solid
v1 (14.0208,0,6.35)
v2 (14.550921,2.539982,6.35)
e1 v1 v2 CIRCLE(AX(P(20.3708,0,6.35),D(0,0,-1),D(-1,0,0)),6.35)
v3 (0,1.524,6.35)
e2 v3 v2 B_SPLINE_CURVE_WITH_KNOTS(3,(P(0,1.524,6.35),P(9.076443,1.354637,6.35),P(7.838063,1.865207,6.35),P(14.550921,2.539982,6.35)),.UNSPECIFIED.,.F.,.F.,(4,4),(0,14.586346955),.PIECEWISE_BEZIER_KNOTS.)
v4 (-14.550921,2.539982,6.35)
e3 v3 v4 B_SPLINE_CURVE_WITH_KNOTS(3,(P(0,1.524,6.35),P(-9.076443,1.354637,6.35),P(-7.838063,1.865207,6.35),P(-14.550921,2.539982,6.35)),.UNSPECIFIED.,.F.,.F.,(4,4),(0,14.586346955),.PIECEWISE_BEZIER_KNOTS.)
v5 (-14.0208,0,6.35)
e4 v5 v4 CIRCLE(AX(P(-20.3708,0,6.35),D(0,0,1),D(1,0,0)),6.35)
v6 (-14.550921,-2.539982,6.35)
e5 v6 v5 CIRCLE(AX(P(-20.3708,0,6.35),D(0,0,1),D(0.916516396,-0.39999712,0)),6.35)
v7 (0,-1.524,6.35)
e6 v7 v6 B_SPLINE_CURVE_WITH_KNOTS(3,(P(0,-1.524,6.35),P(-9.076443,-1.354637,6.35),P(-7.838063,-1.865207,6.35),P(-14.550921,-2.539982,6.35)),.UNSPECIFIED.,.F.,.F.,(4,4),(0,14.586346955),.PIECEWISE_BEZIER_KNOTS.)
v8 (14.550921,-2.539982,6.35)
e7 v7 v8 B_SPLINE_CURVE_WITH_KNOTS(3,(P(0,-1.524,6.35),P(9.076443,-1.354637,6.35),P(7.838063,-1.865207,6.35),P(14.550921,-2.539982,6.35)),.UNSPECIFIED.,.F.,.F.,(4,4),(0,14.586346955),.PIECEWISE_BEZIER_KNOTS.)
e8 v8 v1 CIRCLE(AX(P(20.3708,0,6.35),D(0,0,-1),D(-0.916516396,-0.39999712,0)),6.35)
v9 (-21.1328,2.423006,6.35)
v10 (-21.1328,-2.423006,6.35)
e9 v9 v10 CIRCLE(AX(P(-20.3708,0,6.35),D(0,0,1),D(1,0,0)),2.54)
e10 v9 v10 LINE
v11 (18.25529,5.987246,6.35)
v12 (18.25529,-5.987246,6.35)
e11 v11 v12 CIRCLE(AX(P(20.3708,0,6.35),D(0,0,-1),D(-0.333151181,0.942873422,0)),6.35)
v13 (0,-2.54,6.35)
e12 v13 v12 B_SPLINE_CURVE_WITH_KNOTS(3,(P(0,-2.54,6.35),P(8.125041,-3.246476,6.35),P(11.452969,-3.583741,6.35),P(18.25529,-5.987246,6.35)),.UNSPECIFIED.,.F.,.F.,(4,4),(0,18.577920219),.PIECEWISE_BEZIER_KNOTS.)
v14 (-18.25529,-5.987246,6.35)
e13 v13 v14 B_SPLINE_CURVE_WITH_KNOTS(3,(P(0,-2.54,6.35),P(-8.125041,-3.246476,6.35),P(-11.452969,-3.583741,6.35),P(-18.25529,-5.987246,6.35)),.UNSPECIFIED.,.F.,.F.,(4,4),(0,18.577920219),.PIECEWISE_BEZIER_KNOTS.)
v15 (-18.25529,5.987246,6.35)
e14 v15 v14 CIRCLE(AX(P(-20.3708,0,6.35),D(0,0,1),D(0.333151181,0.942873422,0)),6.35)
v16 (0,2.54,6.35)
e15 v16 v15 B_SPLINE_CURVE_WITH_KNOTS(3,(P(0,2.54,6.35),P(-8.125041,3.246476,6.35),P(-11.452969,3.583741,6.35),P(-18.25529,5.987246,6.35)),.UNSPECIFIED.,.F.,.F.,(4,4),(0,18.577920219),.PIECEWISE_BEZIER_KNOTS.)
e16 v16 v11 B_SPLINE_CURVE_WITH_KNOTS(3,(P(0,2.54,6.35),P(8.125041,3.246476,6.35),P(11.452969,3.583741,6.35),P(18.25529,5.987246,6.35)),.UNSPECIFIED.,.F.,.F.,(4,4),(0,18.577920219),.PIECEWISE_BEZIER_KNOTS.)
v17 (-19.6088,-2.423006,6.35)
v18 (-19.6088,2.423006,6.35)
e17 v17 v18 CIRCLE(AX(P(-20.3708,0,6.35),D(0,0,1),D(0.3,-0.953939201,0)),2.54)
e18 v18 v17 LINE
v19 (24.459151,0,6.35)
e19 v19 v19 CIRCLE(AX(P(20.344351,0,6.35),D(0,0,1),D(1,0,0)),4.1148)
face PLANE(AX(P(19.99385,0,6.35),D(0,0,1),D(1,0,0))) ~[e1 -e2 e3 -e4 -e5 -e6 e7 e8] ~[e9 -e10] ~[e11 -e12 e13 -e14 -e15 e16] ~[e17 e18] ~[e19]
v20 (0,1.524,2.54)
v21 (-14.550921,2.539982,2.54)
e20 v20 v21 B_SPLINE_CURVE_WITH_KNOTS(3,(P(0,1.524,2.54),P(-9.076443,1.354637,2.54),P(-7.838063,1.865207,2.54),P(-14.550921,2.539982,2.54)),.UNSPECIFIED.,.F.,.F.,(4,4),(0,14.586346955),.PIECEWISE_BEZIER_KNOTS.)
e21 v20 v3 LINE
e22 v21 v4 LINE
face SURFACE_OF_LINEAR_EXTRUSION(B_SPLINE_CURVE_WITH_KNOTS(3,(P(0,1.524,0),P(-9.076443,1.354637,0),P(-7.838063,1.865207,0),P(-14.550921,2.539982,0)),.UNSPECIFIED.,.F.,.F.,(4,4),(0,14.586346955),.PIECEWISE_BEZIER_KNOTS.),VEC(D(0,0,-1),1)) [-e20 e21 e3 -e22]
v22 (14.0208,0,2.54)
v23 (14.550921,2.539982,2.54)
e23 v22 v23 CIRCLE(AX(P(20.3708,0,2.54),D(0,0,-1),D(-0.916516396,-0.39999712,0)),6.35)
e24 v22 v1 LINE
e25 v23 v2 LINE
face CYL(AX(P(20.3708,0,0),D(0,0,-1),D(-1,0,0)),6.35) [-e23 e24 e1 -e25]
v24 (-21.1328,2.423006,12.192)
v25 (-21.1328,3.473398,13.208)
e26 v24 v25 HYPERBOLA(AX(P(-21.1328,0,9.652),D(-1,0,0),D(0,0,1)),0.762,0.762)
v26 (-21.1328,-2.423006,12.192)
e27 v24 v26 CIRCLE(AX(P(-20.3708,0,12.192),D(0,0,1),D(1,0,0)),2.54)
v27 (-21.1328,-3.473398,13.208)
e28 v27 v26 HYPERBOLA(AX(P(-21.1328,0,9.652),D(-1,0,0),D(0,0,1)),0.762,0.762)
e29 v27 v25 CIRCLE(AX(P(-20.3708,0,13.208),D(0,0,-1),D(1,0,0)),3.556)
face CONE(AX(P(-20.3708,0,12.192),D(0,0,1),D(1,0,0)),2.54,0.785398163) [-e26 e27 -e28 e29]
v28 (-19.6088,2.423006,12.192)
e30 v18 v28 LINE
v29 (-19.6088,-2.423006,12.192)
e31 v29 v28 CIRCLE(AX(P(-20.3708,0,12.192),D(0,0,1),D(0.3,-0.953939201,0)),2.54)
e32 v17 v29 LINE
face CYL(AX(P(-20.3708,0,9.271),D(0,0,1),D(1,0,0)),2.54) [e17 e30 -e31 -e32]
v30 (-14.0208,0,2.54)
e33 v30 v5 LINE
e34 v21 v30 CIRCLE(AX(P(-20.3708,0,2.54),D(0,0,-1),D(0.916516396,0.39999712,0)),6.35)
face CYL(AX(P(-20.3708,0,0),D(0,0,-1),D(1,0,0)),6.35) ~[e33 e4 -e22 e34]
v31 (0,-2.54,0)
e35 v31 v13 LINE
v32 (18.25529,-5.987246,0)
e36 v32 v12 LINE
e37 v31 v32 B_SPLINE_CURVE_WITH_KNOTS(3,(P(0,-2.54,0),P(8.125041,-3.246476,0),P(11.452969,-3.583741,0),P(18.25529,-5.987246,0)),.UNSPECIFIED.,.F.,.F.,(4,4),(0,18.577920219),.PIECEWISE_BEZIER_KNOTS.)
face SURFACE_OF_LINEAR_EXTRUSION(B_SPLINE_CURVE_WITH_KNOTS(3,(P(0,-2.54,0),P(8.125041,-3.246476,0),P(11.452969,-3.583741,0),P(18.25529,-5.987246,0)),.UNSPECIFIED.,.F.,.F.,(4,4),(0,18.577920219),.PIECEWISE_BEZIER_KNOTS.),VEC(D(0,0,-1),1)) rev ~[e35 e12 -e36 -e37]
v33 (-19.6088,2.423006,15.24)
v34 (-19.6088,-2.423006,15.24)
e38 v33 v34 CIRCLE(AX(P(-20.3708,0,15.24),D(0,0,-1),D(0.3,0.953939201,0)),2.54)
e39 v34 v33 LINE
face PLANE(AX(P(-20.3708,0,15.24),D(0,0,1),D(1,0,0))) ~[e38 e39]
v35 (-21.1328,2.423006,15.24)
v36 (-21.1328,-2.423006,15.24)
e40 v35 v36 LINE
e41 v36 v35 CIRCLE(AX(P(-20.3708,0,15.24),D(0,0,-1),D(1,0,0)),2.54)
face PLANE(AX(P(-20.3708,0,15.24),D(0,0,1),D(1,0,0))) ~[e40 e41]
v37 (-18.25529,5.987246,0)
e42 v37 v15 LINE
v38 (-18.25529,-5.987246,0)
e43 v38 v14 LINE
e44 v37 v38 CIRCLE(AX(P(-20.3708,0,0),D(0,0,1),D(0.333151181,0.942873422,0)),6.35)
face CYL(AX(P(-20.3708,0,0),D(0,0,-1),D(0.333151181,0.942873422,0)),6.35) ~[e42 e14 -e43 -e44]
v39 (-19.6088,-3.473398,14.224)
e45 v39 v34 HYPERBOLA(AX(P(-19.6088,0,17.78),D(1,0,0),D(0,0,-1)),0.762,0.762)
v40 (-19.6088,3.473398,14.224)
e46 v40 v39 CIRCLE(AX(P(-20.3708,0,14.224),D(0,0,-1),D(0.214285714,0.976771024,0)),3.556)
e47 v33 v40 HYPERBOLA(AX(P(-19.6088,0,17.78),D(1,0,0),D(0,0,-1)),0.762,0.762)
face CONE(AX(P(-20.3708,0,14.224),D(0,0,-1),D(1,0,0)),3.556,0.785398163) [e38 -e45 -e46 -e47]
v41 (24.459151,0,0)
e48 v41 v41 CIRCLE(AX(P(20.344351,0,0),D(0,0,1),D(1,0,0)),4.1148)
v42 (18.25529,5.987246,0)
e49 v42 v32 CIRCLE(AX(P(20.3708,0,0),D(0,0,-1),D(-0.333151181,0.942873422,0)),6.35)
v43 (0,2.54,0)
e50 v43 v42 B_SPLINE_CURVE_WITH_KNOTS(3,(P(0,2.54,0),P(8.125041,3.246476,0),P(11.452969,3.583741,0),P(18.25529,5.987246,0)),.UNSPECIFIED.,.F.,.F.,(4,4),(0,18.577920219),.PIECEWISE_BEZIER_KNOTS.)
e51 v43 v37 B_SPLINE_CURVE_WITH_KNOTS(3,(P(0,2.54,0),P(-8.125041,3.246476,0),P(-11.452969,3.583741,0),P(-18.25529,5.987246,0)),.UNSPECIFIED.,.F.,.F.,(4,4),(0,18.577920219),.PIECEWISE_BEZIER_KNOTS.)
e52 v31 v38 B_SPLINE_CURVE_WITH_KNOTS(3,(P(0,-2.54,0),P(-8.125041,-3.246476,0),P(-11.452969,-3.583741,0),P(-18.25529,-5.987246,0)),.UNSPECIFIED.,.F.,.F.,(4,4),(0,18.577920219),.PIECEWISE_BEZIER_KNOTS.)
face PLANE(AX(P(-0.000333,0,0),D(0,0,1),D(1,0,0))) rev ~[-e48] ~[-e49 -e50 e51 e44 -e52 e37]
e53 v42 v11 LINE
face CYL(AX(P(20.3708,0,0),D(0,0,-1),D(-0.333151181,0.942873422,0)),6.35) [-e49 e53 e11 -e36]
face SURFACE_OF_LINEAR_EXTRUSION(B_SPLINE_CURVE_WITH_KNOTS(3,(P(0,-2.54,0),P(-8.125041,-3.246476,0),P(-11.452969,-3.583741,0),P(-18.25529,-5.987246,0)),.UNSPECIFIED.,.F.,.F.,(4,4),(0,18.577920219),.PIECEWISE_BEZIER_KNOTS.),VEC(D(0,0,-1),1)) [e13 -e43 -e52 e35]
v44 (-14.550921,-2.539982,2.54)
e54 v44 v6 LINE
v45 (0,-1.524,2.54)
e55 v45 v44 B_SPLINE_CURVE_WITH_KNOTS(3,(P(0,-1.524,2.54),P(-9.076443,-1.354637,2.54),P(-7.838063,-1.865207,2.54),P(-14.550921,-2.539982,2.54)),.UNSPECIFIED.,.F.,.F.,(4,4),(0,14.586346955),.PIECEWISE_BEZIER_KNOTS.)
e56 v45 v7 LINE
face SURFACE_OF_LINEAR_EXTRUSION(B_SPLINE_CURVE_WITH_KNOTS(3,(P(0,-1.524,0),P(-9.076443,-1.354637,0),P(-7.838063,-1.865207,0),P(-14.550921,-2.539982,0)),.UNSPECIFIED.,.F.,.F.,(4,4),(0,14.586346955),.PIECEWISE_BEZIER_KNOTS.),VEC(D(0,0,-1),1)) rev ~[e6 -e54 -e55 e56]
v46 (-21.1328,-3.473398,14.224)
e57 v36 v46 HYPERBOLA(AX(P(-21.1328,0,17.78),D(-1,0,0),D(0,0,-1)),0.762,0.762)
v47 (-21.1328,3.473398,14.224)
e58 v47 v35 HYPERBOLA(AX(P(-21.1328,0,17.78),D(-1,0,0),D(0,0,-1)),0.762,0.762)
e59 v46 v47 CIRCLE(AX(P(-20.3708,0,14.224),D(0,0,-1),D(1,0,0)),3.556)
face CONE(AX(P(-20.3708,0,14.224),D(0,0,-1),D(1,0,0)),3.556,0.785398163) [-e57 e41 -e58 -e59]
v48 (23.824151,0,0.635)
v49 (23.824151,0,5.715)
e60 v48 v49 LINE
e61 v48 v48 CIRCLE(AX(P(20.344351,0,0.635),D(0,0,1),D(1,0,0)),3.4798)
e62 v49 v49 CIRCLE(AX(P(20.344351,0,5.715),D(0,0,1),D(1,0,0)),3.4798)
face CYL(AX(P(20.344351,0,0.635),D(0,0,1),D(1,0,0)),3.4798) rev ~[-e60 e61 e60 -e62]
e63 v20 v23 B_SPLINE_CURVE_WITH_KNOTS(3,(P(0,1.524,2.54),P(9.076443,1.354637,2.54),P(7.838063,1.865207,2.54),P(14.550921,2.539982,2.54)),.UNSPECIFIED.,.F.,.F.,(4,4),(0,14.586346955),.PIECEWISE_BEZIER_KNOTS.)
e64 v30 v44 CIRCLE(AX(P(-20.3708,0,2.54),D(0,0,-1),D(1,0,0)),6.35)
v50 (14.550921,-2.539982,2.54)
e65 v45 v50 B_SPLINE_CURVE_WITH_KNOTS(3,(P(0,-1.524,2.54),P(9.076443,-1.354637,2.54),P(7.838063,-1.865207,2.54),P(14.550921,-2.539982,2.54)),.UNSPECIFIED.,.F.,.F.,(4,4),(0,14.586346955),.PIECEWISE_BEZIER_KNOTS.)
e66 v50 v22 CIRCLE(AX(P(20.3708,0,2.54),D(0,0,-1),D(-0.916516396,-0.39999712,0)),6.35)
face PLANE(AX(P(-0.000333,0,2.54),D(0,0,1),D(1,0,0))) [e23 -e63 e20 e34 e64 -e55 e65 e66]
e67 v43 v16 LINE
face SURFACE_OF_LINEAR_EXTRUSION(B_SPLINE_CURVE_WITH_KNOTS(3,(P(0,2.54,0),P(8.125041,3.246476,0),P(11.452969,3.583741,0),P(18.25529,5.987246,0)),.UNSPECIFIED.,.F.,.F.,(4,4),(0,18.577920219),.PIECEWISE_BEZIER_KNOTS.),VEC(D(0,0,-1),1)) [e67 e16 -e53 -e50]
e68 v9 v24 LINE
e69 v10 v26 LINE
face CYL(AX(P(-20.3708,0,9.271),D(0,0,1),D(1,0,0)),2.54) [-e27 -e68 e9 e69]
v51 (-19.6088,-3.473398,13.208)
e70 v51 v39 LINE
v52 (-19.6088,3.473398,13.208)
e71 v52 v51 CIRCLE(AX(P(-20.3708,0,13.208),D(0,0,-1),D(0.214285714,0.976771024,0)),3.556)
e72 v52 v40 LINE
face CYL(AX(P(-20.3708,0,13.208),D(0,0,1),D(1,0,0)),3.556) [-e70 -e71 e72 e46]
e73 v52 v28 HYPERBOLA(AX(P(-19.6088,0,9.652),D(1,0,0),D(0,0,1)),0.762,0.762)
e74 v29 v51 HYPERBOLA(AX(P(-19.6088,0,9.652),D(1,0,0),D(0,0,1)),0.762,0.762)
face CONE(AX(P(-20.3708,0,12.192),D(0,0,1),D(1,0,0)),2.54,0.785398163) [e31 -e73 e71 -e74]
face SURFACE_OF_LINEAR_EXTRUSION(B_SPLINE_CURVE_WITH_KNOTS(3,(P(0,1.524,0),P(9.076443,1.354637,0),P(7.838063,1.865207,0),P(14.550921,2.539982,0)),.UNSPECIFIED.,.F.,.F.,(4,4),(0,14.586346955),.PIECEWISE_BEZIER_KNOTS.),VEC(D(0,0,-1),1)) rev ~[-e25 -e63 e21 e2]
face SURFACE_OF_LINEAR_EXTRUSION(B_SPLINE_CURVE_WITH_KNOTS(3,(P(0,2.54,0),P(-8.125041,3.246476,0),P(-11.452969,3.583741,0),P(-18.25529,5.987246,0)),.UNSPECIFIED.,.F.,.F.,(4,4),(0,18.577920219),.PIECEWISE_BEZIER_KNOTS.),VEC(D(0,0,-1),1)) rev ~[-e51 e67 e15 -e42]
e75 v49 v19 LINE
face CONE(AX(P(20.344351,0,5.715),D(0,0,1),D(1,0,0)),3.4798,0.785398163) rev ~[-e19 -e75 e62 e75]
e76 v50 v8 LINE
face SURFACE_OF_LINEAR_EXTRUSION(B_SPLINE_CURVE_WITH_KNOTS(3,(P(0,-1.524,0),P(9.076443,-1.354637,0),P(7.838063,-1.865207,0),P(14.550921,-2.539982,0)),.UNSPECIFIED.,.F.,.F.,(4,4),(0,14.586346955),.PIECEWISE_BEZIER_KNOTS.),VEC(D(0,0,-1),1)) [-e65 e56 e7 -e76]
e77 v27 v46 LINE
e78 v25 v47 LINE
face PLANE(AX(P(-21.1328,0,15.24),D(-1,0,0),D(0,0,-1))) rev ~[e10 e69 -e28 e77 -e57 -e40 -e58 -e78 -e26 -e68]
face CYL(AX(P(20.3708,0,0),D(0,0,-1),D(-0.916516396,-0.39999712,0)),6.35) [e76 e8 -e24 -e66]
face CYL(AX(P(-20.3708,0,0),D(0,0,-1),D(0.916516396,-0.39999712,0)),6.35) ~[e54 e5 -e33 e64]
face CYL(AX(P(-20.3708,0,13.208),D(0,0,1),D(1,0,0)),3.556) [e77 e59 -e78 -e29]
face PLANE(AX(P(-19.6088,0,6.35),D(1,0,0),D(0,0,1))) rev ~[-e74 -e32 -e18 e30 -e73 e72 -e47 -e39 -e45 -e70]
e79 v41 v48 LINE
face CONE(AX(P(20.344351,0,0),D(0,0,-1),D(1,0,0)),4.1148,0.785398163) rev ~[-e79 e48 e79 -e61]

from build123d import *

# Parameters (mm, degrees)
F2_DEPTH = 6.35
F1_W     = 1.778
F1_H     = 3.048
F1_H_2   = 5.842
F1_W_2   = 0.762
F5_DEPTH = 12.7
F6_DEPTH = 2.54


# Not quite as in the source:
# - a pattern or mirror of a feature is missing from the dataset's text; its kind, count and spacing are read off the source's solid
# - a feature names something its author has since deleted; it is built from what else it names


with BuildPart() as f2:
    # F0 (on Top) → F2 (new body)
    with BuildSketch(Plane.XY):
        with BuildLine():
            ThreePointArc((-14.5509208863, -2.5399817128), (-14.1547428746, -1.2973564714), (-14.0208, 0))
            ThreePointArc((-14.0208, 0), (-14.1547428746, 1.2973564714), (-14.5509208863, 2.5399817128))
            ThreePointArc((-14.5509208863, 2.5399817128), (-16.0448887373, 4.6485472727), (-18.2552900028, 5.9872462328))
            ThreePointArc((-18.2552900028, 5.9872462328), (-26.7208, 0), (-18.2552900028, -5.9872462328))
            ThreePointArc((-18.2552900028, -5.9872462328), (-16.0448887373, -4.6485472727), (-14.5509208863, -2.5399817128))
        make_face()
        with BuildLine():
            ThreePointArc((-18.2552900028, 5.9872462328), (-16.0448887373, 4.6485472727), (-14.5509208863, 2.5399817128))
            add(Edge.make_bspline(
                [(0, 1.524), (-9.0764431036, 1.3546369813), (-7.8380626316, 1.8652065321), (-14.5509208863, 2.5399817128)],
                knots=[0, 0, 0, 0, 14.5863469546, 14.5863469546, 14.5863469546, 14.5863469546], degree=3))
            add(Edge.make_bspline(
                [(0, 1.524), (9.0764431036, 1.3546369813), (7.8380626316, 1.8652065321), (14.5509208863, 2.5399817128)],
                knots=[0, 0, 0, 0, 14.5863469546, 14.5863469546, 14.5863469546, 14.5863469546], degree=3))
            ThreePointArc((14.5509208863, 2.5399817128), (16.0448887373, 4.6485472727), (18.2552900028, 5.9872462328))
            add(Edge.make_bspline(
                [(0, 2.54), (8.1250406802, 3.246476237), (11.4529688686, 3.5837408809), (18.2552900028, 5.9872462328)],
                knots=[0, 0, 0, 0, 18.5779202193, 18.5779202193, 18.5779202193, 18.5779202193], degree=3))
            add(Edge.make_bspline(
                [(0, 2.54), (-8.1250406802, 3.246476237), (-11.4529688686, 3.5837408809), (-18.2552900028, 5.9872462328)],
                knots=[0, 0, 0, 0, 18.5779202193, 18.5779202193, 18.5779202193, 18.5779202193], degree=3))
        make_face()
        with BuildLine():
            add(Edge.make_bspline(
                [(0, -1.524), (-9.0764431036, -1.3546369813), (-7.8380626316, -1.8652065321), (-14.5509208863, -2.5399817128)],
                knots=[0, 0, 0, 0, 14.5863469546, 14.5863469546, 14.5863469546, 14.5863469546], degree=3))
            ThreePointArc((-14.5509208863, -2.5399817128), (-16.0448887373, -4.6485472727), (-18.2552900028, -5.9872462328))
            add(Edge.make_bspline(
                [(0, -2.54), (-8.1250406802, -3.246476237), (-11.4529688686, -3.5837408809), (-18.2552900028, -5.9872462328)],
                knots=[0, 0, 0, 0, 18.5779202193, 18.5779202193, 18.5779202193, 18.5779202193], degree=3))
            add(Edge.make_bspline(
                [(0, -2.54), (8.1250406802, -3.246476237), (11.4529688686, -3.5837408809), (18.2552900028, -5.9872462328)],
                knots=[0, 0, 0, 0, 18.5779202193, 18.5779202193, 18.5779202193, 18.5779202193], degree=3))
            ThreePointArc((18.2552900028, -5.9872462328), (16.0448887373, -4.6485472727), (14.5509208863, -2.5399817128))
            add(Edge.make_bspline(
                [(0, -1.524), (9.0764431036, -1.3546369813), (7.8380626316, -1.8652065321), (14.5509208863, -2.5399817128)],
                knots=[0, 0, 0, 0, 14.5863469546, 14.5863469546, 14.5863469546, 14.5863469546], degree=3))
        make_face()
    extrude(amount=F2_DEPTH)

    # F2_copies: F2 across plane


with BuildPart() as f2_1:
    add(f2.part)
    add(f2.part.mirror(Plane(origin=(0, 0, 0), x_dir=(0, 0, 1), z_dir=(1, 0, 0))))

    # F1 (on Front) → F3 (revolve, cut)
    with BuildSketch(Plane.XZ):
        Polygon((20.344351037, 6.35), (20.344351037, 0), (24.459151037, 0), (23.824151037, 0.635), (23.824151037, 5.715), (24.459151037, 6.35), align=None)
    revolve(axis=Axis((20.344351037, 0, 3.175), (0, 0, 1)), mode=Mode.SUBTRACT)

    # F1 (on Front) → F4 (revolve)
    with BuildSketch(Plane.XZ):
        Polygon((-17.8308, 15.24), (-17.8308, 12.192), (-16.8148, 13.208), (-16.8148, 14.224), align=None)
        with Locations((-18.7198, 13.716)):
            Rectangle(F1_W, F1_H)
        with Locations((-22.0218, 13.716)):
            Rectangle(F1_W, F1_H)
        Polygon((-23.9268, 13.208), (-22.9108, 12.192), (-22.9108, 15.24), (-23.9268, 14.224), align=None)
        with Locations((-22.0218, 9.271)):
            Rectangle(F1_W, F1_H_2)
        with Locations((-18.7198, 9.271)):
            Rectangle(F1_W, F1_H_2)
    revolve(axis=Axis((-20.3708, 0, 10.795), (0, 0, 1)))

    # F1 (on Front) → F5 (cut, symmetric)
    with BuildSketch(Plane.XZ):
        with Locations((-19.9898, 13.716)):
            Rectangle(F1_W_2, F1_H)
        with Locations((-20.7518, 13.716)):
            Rectangle(F1_W_2, F1_H)
        with Locations((-19.9898, 9.271)):
            Rectangle(F1_W_2, F1_H_2)
        with Locations((-20.7518, 9.271)):
            Rectangle(F1_W_2, F1_H_2)
    extrude(amount=F5_DEPTH, both=True, mode=Mode.SUBTRACT)

    # F0 (on Top) → F6 (join)
    with BuildSketch(Plane.XY):
        with BuildLine():
            ThreePointArc((-14.5509208863, 2.5399817128), (-14.1547428746, 1.2973564714), (-14.0208, 0))
            ThreePointArc((-14.0208, 0), (-14.1547428746, -1.2973564714), (-14.5509208863, -2.5399817128))
            add(Edge.make_bspline(
                [(0, -1.524), (-9.0764431036, -1.3546369813), (-7.8380626316, -1.8652065321), (-14.5509208863, -2.5399817128)],
                knots=[0, 0, 0, 0, 14.5863469546, 14.5863469546, 14.5863469546, 14.5863469546], degree=3))
            add(Edge.make_bspline(
                [(0, -1.524), (9.0764431036, -1.3546369813), (7.8380626316, -1.8652065321), (14.5509208863, -2.5399817128)],
                knots=[0, 0, 0, 0, 14.5863469546, 14.5863469546, 14.5863469546, 14.5863469546], degree=3))
            ThreePointArc((14.5509208863, -2.5399817128), (14.0208, 0), (14.5509208863, 2.5399817128))
            add(Edge.make_bspline(
                [(0, 1.524), (9.0764431036, 1.3546369813), (7.8380626316, 1.8652065321), (14.5509208863, 2.5399817128)],
                knots=[0, 0, 0, 0, 14.5863469546, 14.5863469546, 14.5863469546, 14.5863469546], degree=3))
            add(Edge.make_bspline(
                [(0, 1.524), (-9.0764431036, 1.3546369813), (-7.8380626316, 1.8652065321), (-14.5509208863, 2.5399817128)],
                knots=[0, 0, 0, 0, 14.5863469546, 14.5863469546, 14.5863469546, 14.5863469546], degree=3))
        make_face()
    extrude(amount=F6_DEPTH)


solid = f2_1.part
